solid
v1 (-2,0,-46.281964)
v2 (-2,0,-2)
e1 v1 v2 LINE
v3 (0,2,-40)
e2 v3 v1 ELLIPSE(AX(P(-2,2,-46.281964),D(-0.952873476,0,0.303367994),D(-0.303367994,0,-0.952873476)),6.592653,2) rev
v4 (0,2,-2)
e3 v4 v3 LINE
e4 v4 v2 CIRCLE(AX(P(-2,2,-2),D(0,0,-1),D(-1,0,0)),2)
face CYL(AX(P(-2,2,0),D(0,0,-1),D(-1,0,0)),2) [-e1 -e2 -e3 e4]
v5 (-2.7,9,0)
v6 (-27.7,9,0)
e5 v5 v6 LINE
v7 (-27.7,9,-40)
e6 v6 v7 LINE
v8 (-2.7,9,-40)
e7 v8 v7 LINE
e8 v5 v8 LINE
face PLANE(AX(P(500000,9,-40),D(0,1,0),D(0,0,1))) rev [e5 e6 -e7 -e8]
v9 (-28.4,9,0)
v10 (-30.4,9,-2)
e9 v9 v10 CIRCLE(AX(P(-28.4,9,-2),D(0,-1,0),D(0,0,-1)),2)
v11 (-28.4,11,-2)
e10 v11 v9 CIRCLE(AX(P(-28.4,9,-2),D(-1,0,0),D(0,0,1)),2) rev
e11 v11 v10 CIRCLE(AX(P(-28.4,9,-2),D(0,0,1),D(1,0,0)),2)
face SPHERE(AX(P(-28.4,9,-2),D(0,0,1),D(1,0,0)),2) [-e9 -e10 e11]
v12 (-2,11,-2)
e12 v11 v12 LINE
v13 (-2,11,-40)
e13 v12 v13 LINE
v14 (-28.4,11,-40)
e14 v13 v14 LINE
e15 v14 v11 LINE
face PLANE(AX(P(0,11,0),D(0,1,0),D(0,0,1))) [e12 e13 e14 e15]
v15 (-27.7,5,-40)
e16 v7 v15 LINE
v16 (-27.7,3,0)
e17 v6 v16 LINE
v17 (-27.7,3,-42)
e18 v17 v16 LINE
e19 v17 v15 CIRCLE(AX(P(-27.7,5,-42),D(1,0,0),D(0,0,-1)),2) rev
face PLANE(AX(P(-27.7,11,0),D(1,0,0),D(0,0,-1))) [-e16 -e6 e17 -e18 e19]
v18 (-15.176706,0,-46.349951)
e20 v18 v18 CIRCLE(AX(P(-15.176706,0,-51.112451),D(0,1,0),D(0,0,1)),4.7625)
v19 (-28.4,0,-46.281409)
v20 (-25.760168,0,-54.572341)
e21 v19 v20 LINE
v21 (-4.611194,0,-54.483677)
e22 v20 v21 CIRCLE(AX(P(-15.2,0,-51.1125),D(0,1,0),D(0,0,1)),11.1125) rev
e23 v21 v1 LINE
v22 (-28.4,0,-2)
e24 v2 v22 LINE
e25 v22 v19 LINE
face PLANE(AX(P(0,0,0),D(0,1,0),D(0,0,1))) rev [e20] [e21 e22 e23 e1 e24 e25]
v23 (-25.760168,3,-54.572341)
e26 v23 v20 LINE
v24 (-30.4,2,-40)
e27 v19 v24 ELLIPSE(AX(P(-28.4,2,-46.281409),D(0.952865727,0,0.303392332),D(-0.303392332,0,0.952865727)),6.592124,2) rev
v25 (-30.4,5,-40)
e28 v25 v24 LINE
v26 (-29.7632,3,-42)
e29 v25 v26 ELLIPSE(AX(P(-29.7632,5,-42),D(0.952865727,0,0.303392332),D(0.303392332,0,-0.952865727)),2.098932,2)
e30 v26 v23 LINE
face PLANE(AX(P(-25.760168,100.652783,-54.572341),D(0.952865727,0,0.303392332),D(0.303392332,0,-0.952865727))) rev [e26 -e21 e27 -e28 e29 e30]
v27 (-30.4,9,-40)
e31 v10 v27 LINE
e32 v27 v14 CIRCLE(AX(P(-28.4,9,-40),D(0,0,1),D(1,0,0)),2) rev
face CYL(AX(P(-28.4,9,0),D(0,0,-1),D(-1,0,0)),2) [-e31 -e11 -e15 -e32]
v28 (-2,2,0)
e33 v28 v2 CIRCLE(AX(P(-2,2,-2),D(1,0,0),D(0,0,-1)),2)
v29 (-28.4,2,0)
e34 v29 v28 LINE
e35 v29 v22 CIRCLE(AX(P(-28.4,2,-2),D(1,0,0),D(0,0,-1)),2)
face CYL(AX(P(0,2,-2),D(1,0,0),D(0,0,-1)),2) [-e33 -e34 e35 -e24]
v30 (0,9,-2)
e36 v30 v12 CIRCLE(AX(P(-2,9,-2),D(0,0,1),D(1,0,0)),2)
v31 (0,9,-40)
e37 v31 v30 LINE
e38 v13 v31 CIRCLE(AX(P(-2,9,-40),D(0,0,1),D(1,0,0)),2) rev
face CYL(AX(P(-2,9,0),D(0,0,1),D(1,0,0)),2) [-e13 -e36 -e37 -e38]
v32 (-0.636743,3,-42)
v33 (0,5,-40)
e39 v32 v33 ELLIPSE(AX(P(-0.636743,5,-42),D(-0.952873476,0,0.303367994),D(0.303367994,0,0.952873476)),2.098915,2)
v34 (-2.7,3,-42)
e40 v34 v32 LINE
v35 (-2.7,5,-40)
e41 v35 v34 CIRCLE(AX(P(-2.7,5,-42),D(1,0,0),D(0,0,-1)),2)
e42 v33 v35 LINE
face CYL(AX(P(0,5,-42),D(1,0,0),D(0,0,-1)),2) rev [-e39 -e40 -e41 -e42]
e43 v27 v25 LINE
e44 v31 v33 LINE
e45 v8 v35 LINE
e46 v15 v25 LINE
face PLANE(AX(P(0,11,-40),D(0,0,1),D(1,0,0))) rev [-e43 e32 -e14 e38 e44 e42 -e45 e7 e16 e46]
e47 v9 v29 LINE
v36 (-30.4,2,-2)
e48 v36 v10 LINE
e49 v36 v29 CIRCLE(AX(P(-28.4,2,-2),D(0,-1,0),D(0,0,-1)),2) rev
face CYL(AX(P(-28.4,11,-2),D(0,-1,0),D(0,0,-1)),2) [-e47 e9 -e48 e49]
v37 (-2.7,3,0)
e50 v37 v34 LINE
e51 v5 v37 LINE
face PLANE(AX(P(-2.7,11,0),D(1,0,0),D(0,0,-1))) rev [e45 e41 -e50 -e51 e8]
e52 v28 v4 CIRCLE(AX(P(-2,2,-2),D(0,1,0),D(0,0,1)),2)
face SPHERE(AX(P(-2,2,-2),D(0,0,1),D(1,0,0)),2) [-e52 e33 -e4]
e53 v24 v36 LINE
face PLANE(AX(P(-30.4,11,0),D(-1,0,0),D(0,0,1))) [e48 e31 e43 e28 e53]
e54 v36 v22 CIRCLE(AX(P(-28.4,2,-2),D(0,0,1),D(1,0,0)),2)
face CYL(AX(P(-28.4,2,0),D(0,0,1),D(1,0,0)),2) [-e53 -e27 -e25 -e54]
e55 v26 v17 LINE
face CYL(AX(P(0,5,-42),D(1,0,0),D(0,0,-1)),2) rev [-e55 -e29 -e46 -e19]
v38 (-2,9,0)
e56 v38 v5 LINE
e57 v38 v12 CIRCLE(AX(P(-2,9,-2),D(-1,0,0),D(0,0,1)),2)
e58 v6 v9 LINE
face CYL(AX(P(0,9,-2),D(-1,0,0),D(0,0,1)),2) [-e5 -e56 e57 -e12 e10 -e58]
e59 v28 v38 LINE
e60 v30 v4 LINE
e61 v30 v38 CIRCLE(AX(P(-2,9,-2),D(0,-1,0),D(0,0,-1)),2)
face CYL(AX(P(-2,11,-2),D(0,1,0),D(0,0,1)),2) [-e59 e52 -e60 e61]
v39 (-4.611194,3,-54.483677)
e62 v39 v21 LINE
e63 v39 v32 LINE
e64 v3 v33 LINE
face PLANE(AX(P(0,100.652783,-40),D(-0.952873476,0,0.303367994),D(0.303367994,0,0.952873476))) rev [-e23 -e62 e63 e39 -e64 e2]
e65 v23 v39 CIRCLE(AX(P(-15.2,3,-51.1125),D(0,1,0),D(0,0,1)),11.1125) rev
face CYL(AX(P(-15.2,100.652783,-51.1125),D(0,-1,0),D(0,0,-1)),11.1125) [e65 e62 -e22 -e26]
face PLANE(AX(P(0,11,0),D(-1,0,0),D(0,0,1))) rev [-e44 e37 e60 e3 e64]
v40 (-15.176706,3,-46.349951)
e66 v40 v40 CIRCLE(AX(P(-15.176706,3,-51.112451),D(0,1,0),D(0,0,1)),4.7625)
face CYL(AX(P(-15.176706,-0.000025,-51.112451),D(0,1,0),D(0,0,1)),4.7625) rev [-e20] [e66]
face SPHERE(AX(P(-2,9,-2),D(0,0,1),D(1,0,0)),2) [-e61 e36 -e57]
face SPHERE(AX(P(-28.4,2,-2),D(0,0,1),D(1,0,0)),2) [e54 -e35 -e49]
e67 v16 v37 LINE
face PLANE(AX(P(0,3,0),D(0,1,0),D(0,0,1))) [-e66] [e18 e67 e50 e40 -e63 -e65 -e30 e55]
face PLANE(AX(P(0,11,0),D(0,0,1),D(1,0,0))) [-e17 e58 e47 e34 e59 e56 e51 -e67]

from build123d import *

# Parameters (mm, degrees)
SKETCH1_W               = 2.7
SKETCH1_H               = 40
BOSS_EXTRUDE2_DEPTH     = 11
BOSS_EXTRUDE2_2_DEPTH   = 11
SKETCH3_W               = 25
SKETCH3_H               = 40
BOSS_EXTRUDE3_DEPTH     = 3
BOSS_EXTRUDE4_REACH     = 51.883
SKETCH4_W               = 40
SKETCH4_H               = 2
SKETCH5_W               = 30.4
SKETCH5_H               = 3
BOSS_EXTRUDE5_DEPTH     = 22.225
CUT_EXTRUDE1_DEPTH      = 70.714493651
CUT_EXTRUDE1_DEPTH_BACK = 70.714493651
SKETCH7_R               = 4.7625
CUT_EXTRUDE2_DEPTH      = 70.714493651
FILLET6_R               = 2
FILLET8_R               = 2
FILLET9_R               = 2
FILLET10_R              = 2


with BuildPart() as part:
    # Sketch1 → Boss-Extrude2 (new body)
    with BuildSketch(Plane(origin=(0, 0, 0), x_dir=(1, 0, 0), z_dir=(0, 1, 0))):
        with Locations((-29.05, 20)):
            Rectangle(SKETCH1_W, SKETCH1_H)
    extrude(amount=BOSS_EXTRUDE2_DEPTH)



with BuildPart() as body_2:
    # Sketch1 → Boss-Extrude2 2 (new body)
    with BuildSketch(Plane(origin=(0, 0, 0), x_dir=(1, 0, 0), z_dir=(0, 1, 0))):
        with Locations((-1.35, 20)):
            Rectangle(SKETCH1_W, SKETCH1_H)
    extrude(amount=BOSS_EXTRUDE2_2_DEPTH)


with BuildPart() as part_1:
    add(part.part)

    add(body_2.part)  # Boss-Extrude3 merges body 2
    # Sketch3 → Boss-Extrude3 (add)
    with BuildSketch(Plane(origin=(0, 0, 0), x_dir=(1, 0, 0), z_dir=(0, 1, 0))):
        with Locations((-15.2, 20)):
            Rectangle(SKETCH3_W, SKETCH3_H)
    extrude(amount=BOSS_EXTRUDE3_DEPTH)

    # Sketch4 → Boss-Extrude4 (add, up to next)
    with BuildSketch(Plane(origin=(-27.7, 0, 0), x_dir=(0, 0, -1), z_dir=(1, 0, 0)), mode=Mode.PRIVATE) as boss_extrude4_sk1:
        with Locations((20, 10)):
            Rectangle(SKETCH4_W, SKETCH4_H)
    boss_extrude4_tool1 = extrude(boss_extrude4_sk1.sketch, amount=BOSS_EXTRUDE4_REACH, mode=Mode.PRIVATE) - part_1.part
    add(boss_extrude4_tool1.solids().sort_by_distance((-27.7, 10, -20))[0])

    # Sketch5 → Boss-Extrude5 (add)
    with BuildSketch(Plane(origin=(0, 0, -40), x_dir=(-1, 0, 0), z_dir=(0, 0, -1))):
        with Locations((15.2, 1.5)):
            Rectangle(SKETCH5_W, SKETCH5_H)
    extrude(amount=BOSS_EXTRUDE5_DEPTH)

    # Sketch6 → Cut-Extrude1 (cut, two sides: drawn at the far end of the back side and taken through both)
    with BuildSketch(Plane(origin=(0, 3, 0), x_dir=(1, 0, 0), z_dir=(0, 1, 0)).offset(-CUT_EXTRUDE1_DEPTH_BACK)):
        with BuildLine():
            Line((33.516714256, -65.275403725), (0, 40))
            Line((0, 40), (-4.611193503, 54.483676829))
            ThreePointArc((-4.611193503, 54.483676829), (-15.153412609, 62.224902344), (-25.760168287, 54.572341326))
            Line((-25.760168287, 54.572341326), (-30.4, 40))
            Line((-30.4, 40), (-63.919403204, -65.274547602))
            Line((-63.919403204, -65.274547602), (-63.917461702, 155.689528782))
            Line((-63.917461702, 155.689528782), (33.518655758, 155.688672658))
            Line((33.518655758, 155.688672658), (33.516714256, -65.275403725))
        make_face()
    extrude(amount=CUT_EXTRUDE1_DEPTH + CUT_EXTRUDE1_DEPTH_BACK, mode=Mode.SUBTRACT)

    # Sketch7 → Cut-Extrude2 (cut, through all)
    with BuildSketch(Plane(origin=(0, 3, 0), x_dir=(1, 0, 0), z_dir=(0, 1, 0))):
        with Locations(Location((-15.176706304, 51.112451172, 0), (0, 0, 270))):
            Circle(SKETCH7_R)
    extrude(amount=-CUT_EXTRUDE2_DEPTH, mode=Mode.SUBTRACT)

    # Fillet6
    fillet6_edges = [part_1.edges().sort_by_distance(p)[0] for p in [
        (-15.2, 11, 0),
    ]]
    fillet(fillet6_edges, radius=FILLET6_R - 0.0001)  # a hair under: the kernel refuses the full size

    # Fillet8
    fillet8_edges = [part_1.edges().sort_by_distance(p)[0] for p in [
        (0, 4.50005, 0),
        (0, 10.414242852, -0.585757148),
        (-30.4, 4.50005, 0),
        (-30.4, 10.414242852, -0.585757148),
        (0, 11, -20.99995),
        (-30.4, 11, -20.99995),
    ]]
    fillet(fillet8_edges, radius=FILLET8_R - 0.0001)  # a hair under: the kernel refuses the full size

    # Fillet9
    fillet9_edges = [part_1.edges().sort_by_distance(p)[0] for p in [
        (0, 0, -20.99995),
        (-0.585757148, 0, -0.585757148),
        (-15.2, 0, 0),
        (-29.814242852, 0, -0.585757148),
        (-30.4, 0, -20.99995),
    ]]
    fillet(fillet9_edges, radius=FILLET9_R - 0.0001)  # a hair under: the kernel refuses the full size

    # Fillet10
    fillet10_edges = [part_1.edges().sort_by_distance(p)[0] for p in [
        (-1.35, 3, -40),
        (-29.05, 3, -40),
    ]]
    fillet(fillet10_edges, radius=FILLET10_R)


solid = part_1.part
